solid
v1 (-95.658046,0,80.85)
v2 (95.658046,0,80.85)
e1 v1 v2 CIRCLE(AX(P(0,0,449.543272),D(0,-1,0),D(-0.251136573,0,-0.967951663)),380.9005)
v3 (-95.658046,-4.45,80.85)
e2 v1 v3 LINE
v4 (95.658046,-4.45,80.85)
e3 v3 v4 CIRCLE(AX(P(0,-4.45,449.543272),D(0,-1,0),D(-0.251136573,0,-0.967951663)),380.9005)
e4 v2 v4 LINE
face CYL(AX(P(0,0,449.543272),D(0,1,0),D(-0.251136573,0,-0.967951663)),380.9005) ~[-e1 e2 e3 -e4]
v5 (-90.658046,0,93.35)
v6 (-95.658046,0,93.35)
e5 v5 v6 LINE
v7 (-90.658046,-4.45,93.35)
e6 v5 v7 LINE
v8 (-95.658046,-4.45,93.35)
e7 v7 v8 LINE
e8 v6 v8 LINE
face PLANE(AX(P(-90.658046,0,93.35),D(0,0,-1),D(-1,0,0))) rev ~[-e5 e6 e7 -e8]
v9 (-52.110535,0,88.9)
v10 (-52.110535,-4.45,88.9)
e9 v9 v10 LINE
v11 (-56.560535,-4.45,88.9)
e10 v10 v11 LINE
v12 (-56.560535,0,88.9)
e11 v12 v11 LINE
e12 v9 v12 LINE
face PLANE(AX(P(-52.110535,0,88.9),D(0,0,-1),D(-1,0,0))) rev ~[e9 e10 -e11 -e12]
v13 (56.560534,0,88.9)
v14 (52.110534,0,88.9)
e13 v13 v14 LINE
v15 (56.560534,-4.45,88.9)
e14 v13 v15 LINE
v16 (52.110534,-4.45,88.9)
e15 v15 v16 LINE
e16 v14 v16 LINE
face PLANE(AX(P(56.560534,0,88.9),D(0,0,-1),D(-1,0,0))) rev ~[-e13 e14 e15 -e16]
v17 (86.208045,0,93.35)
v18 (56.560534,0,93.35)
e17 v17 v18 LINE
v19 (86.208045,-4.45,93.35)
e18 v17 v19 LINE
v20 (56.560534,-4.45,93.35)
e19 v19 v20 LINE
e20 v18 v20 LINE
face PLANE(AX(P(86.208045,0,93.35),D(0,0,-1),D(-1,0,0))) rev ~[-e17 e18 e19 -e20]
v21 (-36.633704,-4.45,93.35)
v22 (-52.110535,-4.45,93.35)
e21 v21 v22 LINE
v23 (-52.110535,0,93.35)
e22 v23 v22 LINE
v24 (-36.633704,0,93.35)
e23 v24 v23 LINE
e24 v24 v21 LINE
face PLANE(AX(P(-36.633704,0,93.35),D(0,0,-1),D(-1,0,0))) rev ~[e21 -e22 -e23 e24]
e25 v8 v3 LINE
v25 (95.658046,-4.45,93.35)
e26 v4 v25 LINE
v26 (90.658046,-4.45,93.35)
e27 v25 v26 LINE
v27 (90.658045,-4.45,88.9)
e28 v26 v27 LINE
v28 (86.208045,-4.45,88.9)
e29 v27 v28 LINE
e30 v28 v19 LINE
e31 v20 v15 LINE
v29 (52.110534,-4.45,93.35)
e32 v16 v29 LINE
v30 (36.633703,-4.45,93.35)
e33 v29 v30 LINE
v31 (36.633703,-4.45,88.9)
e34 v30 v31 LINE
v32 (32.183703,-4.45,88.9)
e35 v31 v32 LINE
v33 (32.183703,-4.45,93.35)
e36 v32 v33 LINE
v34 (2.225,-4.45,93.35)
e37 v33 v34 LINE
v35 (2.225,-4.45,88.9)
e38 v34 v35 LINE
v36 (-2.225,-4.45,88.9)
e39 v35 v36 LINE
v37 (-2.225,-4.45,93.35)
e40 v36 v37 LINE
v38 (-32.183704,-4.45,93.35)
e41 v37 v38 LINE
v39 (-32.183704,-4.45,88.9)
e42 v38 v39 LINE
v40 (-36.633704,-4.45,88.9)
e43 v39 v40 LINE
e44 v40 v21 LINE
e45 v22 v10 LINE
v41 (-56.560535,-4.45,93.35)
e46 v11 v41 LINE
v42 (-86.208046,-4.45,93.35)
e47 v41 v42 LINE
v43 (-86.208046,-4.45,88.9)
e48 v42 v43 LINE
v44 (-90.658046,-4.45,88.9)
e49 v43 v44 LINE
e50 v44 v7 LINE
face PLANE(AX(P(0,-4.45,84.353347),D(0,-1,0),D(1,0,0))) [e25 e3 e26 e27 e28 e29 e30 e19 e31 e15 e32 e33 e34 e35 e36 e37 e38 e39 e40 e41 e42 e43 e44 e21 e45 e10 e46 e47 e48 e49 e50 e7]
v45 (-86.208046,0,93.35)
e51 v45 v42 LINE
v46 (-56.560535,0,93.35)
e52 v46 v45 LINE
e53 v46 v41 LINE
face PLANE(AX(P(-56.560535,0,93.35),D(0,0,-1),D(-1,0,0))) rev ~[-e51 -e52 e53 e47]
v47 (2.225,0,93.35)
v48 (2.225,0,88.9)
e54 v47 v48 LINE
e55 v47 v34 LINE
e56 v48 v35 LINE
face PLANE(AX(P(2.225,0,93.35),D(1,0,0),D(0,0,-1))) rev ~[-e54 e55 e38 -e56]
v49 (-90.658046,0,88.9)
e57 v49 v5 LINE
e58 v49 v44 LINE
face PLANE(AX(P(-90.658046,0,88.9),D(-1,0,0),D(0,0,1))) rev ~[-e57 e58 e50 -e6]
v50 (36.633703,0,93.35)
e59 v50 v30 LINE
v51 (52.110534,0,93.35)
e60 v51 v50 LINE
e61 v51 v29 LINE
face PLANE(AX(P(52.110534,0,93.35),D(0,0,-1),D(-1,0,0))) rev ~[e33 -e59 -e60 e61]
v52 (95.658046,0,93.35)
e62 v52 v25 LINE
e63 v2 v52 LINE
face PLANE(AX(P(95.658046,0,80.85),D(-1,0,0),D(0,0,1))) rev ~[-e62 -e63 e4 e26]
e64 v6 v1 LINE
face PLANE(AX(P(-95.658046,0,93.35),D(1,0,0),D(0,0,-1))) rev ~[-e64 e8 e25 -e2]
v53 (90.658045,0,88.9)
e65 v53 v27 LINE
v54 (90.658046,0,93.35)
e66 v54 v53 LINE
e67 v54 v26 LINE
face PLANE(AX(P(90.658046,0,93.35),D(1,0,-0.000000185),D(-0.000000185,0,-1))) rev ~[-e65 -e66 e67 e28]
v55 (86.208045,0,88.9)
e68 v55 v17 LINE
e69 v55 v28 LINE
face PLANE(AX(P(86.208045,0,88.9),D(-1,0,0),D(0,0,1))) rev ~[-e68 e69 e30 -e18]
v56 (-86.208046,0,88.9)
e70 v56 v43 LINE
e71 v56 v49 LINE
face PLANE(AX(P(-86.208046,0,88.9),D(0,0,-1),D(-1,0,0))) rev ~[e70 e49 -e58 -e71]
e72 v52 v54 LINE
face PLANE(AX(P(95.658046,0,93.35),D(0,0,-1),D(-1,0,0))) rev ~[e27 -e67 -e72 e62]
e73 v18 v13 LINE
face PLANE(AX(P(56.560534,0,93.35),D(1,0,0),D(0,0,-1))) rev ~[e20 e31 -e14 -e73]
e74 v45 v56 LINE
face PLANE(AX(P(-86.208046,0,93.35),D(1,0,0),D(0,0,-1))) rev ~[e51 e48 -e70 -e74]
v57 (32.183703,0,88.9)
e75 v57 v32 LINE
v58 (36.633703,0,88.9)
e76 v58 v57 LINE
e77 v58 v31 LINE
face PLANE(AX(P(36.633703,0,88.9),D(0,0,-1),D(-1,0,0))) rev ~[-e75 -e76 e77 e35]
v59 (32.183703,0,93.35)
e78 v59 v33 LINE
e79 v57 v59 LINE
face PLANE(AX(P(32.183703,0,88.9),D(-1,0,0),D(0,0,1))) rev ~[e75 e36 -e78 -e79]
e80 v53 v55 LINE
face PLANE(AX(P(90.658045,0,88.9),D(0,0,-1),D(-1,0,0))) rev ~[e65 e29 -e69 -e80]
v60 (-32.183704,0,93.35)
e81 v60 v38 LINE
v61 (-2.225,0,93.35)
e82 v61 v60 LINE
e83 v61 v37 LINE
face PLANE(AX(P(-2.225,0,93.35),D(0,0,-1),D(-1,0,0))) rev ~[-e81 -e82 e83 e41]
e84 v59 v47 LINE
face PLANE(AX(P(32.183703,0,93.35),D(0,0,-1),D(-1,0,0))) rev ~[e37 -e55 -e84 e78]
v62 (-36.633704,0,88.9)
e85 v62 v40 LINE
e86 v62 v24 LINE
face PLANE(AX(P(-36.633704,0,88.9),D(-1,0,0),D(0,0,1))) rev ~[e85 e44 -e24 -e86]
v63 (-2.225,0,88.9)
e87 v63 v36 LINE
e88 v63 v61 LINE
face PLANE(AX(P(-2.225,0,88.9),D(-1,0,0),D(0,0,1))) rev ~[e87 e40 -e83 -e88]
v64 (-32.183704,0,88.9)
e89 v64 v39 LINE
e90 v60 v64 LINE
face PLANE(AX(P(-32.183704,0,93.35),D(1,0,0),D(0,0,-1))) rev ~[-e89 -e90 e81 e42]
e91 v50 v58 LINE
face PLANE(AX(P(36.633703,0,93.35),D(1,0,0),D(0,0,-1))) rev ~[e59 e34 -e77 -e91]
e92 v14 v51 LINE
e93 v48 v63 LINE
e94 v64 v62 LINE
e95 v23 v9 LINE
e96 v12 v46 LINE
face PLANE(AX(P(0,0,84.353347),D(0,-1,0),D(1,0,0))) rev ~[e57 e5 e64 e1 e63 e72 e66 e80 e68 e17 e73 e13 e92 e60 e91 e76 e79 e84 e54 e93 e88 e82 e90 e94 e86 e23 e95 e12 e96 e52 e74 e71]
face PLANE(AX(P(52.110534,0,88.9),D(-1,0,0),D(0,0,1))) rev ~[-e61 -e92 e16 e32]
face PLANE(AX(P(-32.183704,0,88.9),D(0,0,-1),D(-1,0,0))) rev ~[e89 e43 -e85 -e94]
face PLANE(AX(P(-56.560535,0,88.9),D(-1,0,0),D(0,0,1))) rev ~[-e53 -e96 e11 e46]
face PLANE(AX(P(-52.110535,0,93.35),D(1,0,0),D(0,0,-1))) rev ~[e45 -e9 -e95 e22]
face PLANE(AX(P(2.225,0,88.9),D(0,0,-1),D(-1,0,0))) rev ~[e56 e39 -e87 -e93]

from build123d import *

# Parameters (mm, degrees)
F1_DEPTH = 4.45


# Not quite as in the source:
# - ends of sketch curves that miss each other by under 0.0002 mm in the source are joined


with BuildPart() as f1:
    # F0 (on Front) → F1 (new body)
    with BuildSketch(Plane.XZ):
        with BuildLine():
            Line((2.225, 93.35), (2.225, 88.9))
            Line((2.225, 88.9), (-2.225, 88.9))
            Line((-2.225, 88.9), (-2.225, 93.35))
            Line((-2.225, 93.35), (-32.1837038577, 93.35))
            Line((-32.1837038577, 93.35), (-32.1837038577, 88.9))
            Line((-32.1837038577, 88.9), (-36.6337038577, 88.9))
            Line((-36.6337038577, 88.9), (-36.6337038577, 93.35))
            Line((-36.6337038577, 93.35), (-52.1105349839, 93.35))
            Line((-52.1105349839, 93.35), (-52.1105349839, 88.9))
            Line((-52.1105349839, 88.9), (-56.5605349839, 88.9))
            Line((-56.5605349839, 88.9), (-56.5605349839, 93.35))
            Line((-56.5605349839, 93.35), (-86.2080463052, 93.35))
            Line((-86.2080463052, 93.35), (-86.2080463052, 88.9))
            Line((-86.2080463052, 88.9), (-90.6580463052, 88.9))
            Line((-90.6580463052, 88.9), (-90.6580463052, 93.35))
            Line((-90.6580463052, 93.35), (-95.6580463052, 93.35))
            Line((-95.6580463052, 93.35), (-95.6580463052, 80.85))
            ThreePointArc((-95.6580463052, 80.85), (0, 68.6427723395), (95.6580463052, 80.85))
            Line((95.6580463052, 80.85), (95.6580463052, 93.35))
            Line((95.6580463052, 93.35), (90.6580463052, 93.35))
            Line((90.6580463052, 93.35), (90.6580454826, 88.9))
            Line((90.6580454826, 88.9), (86.2080454826, 88.9))
            Line((86.2080454826, 88.9), (86.2080454826, 93.35))
            Line((86.2080454826, 93.35), (56.5605341613, 93.35))
            Line((56.5605341613, 93.35), (56.5605341613, 88.9))
            Line((56.5605341613, 88.9), (52.1105341613, 88.9))
            Line((52.1105341613, 88.9), (52.1105341613, 93.35))
            Line((52.1105341613, 93.35), (36.6337030351, 93.35))
            Line((36.6337030351, 93.35), (36.6337030351, 88.9))
            Line((36.6337030351, 88.9), (32.1837030351, 88.9))
            Line((32.1837030351, 88.9), (32.1837030351, 93.35))
            Line((32.1837030351, 93.35), (2.225, 93.35))
        make_face()
    extrude(amount=F1_DEPTH)


solid = f1.part
